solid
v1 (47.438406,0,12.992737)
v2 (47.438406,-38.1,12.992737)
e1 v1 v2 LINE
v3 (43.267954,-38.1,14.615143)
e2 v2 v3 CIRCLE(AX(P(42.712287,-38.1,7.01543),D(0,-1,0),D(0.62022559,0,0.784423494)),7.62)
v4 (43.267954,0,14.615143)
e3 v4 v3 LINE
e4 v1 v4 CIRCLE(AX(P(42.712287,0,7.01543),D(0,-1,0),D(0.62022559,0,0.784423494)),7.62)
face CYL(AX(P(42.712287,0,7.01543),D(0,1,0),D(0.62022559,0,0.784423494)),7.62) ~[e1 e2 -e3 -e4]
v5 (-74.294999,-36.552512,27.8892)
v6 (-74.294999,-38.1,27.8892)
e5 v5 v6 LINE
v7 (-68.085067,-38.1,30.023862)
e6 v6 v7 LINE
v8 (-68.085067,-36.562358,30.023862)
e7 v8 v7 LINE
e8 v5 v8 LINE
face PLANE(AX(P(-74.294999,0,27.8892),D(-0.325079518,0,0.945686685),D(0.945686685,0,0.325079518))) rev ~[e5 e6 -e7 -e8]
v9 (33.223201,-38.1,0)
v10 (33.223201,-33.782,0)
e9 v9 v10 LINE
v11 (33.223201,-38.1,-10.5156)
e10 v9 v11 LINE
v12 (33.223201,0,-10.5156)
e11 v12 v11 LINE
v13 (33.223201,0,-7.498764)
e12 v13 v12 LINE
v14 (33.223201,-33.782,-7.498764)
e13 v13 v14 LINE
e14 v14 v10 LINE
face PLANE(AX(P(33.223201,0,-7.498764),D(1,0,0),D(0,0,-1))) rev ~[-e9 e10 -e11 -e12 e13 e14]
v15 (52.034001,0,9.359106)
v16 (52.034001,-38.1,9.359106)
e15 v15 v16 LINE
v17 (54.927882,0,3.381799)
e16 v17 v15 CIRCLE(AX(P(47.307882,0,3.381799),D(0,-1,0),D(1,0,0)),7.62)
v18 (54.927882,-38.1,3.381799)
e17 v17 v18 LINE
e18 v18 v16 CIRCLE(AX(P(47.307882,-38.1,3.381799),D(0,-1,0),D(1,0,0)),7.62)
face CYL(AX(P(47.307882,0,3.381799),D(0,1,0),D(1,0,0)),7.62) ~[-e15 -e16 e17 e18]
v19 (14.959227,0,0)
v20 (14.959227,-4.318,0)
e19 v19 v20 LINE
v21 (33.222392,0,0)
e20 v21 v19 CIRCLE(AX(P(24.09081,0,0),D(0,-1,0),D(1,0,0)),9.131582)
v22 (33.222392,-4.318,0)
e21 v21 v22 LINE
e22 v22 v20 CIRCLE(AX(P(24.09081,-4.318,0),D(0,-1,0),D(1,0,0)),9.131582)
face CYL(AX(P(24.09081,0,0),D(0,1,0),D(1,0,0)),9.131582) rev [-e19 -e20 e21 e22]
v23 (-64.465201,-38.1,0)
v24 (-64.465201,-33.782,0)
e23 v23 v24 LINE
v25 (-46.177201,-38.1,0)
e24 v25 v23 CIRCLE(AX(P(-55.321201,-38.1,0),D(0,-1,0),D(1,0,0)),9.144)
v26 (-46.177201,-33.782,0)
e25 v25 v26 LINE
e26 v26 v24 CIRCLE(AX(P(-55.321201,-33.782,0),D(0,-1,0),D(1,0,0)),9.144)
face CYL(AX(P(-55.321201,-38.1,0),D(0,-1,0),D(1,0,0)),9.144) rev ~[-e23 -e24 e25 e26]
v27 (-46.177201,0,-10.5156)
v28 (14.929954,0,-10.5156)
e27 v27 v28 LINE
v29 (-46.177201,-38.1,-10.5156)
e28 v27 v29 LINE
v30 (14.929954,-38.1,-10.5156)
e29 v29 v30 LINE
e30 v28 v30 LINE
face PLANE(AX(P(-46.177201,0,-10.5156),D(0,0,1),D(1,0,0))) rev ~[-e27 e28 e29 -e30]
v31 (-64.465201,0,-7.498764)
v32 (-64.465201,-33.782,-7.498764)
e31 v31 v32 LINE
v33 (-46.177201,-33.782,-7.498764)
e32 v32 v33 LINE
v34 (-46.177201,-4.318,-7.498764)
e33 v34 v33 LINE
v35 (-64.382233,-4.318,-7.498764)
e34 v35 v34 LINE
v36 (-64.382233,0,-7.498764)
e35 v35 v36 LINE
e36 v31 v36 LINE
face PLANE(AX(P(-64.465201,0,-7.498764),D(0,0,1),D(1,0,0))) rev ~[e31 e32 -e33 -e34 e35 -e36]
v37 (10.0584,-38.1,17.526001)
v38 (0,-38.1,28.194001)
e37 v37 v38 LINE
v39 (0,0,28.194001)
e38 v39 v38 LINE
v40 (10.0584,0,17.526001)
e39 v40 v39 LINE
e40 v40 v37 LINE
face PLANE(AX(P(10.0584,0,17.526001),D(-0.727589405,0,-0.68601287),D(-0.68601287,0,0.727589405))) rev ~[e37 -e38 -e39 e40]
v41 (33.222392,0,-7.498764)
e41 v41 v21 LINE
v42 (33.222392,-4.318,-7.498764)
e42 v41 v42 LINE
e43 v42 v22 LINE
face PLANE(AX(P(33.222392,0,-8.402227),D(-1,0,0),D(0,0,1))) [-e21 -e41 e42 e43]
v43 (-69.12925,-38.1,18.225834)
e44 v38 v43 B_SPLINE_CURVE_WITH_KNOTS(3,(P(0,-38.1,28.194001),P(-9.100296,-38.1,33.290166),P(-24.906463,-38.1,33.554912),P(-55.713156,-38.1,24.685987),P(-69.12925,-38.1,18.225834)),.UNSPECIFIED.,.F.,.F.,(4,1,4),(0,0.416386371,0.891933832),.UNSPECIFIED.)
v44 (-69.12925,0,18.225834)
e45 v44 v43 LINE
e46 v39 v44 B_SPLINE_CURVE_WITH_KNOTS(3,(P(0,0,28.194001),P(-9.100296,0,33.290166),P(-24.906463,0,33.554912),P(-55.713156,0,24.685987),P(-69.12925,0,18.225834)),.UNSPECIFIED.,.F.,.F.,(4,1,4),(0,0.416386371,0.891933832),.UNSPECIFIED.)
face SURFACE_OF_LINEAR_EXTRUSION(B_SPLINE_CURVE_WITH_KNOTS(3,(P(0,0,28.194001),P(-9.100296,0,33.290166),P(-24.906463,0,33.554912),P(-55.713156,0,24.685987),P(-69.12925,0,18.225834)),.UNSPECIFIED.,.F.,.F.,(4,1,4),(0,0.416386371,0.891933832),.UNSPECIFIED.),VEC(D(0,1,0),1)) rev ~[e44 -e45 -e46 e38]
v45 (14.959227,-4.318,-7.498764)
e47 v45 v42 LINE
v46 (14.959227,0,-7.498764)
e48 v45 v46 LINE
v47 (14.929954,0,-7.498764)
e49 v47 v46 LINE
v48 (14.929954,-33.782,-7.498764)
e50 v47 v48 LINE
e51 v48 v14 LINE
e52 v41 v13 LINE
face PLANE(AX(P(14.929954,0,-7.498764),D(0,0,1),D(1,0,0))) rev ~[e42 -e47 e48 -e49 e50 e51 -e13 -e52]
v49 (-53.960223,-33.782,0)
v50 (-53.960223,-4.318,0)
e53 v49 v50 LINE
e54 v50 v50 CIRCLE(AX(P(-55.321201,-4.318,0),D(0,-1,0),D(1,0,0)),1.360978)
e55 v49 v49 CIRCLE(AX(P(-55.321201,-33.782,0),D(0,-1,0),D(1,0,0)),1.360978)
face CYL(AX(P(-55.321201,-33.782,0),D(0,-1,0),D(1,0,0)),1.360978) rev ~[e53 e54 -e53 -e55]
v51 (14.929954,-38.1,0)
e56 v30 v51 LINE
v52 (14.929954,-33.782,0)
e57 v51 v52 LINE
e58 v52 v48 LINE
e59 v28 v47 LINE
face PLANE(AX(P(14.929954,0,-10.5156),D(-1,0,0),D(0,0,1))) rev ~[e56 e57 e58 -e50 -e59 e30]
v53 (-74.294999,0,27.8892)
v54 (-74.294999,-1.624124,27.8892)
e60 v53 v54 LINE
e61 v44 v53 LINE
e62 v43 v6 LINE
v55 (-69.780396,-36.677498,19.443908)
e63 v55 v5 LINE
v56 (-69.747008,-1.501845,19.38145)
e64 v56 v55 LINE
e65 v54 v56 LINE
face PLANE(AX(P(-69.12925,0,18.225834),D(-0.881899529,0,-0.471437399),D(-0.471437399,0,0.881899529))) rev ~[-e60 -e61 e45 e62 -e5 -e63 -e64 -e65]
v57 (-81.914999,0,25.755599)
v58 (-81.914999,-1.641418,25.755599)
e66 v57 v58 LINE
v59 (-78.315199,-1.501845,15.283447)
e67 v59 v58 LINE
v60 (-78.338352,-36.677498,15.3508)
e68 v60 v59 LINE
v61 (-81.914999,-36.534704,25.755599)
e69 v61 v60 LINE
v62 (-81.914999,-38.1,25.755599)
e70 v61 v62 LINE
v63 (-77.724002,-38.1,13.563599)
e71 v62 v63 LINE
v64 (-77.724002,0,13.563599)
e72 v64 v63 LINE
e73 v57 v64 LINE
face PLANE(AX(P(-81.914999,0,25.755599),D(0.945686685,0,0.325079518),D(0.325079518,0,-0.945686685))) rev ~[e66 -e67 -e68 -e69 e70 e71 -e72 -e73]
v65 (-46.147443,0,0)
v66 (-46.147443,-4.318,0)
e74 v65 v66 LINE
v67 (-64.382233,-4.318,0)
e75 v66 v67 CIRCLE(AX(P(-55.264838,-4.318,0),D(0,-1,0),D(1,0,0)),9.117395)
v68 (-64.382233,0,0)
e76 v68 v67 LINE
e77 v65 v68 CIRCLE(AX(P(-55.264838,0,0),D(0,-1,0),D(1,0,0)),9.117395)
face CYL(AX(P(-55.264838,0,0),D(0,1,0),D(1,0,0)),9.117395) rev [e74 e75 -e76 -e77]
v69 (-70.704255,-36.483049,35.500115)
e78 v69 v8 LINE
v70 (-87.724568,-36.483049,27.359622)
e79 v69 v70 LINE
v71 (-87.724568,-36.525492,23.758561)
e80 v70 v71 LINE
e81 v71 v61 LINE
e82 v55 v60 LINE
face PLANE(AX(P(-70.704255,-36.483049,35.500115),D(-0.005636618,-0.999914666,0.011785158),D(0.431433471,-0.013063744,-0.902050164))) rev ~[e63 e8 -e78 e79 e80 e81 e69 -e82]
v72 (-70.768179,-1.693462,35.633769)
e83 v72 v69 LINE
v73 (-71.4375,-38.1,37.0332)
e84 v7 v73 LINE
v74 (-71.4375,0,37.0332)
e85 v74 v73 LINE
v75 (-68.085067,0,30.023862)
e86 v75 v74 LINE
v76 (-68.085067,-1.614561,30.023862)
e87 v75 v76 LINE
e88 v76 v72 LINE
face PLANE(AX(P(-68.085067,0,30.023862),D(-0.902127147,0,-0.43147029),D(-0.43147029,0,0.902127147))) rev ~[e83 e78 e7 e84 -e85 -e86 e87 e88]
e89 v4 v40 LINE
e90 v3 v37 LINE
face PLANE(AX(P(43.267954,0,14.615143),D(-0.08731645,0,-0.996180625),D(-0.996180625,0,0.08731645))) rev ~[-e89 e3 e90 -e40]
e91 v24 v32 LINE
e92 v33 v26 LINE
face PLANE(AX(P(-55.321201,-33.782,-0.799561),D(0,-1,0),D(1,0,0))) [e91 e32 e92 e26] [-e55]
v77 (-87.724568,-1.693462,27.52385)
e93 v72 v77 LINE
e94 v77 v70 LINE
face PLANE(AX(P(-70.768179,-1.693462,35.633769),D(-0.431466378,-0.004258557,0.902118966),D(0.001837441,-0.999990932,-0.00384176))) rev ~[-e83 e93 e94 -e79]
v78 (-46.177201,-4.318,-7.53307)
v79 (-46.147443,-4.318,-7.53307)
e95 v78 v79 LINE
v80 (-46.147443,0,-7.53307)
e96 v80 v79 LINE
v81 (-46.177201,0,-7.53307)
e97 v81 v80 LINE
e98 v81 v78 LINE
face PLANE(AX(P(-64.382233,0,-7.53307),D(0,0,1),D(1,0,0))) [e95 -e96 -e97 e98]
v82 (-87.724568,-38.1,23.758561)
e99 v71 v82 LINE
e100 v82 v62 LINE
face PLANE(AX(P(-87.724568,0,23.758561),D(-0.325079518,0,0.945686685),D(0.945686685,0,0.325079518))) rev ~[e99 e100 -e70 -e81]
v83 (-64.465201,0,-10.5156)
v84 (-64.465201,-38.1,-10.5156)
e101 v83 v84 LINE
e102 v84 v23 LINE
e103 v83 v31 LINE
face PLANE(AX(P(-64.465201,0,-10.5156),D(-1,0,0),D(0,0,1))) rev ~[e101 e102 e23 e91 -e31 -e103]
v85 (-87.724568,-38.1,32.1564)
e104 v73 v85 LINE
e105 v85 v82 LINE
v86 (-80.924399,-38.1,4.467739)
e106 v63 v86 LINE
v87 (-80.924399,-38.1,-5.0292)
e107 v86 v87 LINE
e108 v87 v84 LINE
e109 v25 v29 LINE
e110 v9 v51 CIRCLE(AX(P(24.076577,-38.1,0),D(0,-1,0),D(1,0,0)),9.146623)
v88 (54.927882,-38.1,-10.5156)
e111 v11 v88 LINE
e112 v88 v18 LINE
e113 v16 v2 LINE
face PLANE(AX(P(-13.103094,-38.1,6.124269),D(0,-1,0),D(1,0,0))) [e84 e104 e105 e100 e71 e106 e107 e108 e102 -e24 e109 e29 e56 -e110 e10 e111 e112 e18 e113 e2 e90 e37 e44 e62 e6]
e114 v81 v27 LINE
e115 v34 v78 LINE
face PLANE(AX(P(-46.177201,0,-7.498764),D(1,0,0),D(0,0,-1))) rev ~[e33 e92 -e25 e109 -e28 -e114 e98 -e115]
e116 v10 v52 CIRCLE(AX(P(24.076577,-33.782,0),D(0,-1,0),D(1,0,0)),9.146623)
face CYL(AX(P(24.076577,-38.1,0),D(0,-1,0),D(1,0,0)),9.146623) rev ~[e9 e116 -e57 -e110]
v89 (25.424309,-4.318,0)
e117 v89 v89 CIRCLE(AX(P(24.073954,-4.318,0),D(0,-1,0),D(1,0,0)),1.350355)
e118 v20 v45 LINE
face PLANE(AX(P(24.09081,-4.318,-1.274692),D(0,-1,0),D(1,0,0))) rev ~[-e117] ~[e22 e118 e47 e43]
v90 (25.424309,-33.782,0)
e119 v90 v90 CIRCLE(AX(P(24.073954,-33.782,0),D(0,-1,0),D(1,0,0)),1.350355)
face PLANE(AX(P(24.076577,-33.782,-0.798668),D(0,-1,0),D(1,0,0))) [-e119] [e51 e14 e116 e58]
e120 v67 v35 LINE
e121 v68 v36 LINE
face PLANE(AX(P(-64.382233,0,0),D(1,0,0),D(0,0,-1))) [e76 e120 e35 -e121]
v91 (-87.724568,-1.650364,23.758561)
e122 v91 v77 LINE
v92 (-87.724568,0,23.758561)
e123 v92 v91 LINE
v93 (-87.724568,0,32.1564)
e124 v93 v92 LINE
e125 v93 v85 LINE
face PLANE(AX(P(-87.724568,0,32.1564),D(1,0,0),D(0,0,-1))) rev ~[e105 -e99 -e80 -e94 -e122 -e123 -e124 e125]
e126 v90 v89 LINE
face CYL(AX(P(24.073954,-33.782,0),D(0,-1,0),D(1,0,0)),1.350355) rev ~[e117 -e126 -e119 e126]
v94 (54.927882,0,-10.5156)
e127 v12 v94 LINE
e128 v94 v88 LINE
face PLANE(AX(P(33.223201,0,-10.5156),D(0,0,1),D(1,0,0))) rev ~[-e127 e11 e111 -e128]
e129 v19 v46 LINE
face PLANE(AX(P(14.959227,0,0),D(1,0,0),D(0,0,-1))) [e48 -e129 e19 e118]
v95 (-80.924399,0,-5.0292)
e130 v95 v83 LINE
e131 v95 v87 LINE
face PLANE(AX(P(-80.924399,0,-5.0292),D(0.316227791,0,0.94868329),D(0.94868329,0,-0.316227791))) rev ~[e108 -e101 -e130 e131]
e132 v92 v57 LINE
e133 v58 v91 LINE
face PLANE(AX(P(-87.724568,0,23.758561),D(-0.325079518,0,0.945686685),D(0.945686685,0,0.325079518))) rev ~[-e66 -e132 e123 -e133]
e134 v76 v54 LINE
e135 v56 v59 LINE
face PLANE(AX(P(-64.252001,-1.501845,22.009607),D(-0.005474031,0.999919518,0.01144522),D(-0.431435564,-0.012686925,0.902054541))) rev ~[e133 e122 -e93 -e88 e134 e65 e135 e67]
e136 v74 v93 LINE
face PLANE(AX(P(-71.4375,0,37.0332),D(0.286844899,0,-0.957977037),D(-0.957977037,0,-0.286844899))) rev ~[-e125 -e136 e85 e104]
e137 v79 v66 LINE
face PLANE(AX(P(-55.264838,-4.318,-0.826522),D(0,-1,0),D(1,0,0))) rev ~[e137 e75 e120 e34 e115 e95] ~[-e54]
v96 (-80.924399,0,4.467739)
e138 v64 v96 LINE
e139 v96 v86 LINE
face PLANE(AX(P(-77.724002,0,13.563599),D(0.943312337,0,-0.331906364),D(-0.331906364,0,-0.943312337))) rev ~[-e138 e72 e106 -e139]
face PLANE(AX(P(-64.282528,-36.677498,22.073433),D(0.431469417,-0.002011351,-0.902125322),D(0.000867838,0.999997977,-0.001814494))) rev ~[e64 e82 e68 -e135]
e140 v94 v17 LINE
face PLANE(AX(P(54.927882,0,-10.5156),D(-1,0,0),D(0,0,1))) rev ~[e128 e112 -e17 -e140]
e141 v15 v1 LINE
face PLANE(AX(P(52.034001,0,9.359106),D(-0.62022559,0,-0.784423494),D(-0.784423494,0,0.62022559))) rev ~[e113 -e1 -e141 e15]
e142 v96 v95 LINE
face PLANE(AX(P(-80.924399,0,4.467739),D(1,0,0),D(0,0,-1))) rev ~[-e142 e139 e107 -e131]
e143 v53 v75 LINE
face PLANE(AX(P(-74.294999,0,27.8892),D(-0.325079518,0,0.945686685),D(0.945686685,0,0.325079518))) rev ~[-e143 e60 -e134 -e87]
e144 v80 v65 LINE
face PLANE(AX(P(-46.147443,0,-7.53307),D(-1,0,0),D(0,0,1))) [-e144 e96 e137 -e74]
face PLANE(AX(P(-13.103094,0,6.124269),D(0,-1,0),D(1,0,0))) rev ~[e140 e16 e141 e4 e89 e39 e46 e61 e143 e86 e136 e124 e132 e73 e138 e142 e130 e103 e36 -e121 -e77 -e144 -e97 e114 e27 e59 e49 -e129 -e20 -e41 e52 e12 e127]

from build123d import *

# Parameters (mm, degrees)
F1_DEPTH  = 38.1
F3_DEPTH  = 25.4
F6_DEPTH  = 4.318
F8_DEPTH  = 4.318
F9_R      = 1.3609782851
F9_R_2    = 1.3503546706
F10_DEPTH = 61.214


# Not quite as in the source:
# - a feature names something its author has since deleted; it is built from what else it names


with BuildPart() as f1:
    # F0 (on Front) → F1 (new body)
    with BuildSketch(Plane.XZ):
        with BuildLine():
            Line((52.0340008008, 9.3591057662), (47.4384056476, 12.9927370075))
            ThreePointArc((47.4384056476, 12.9927370075), (45.4749605723, 14.1169814212), (43.2679541409, 14.615142718))
            Line((43.2679541409, 14.615142718), (10.0584002212, 17.5260007381))
            Line((10.0584002212, 17.5260007381), (0, 28.1940009445))
            add(Edge.make_bspline(
                [(0, 28.1940009445), (-9.1002955269, 33.2901659502), (-24.9064630473, 33.5549116559), (-55.7131559047, 24.6859865442), (-69.1292500573, 18.2258343206)],
                knots=[0, 0, 0, 0, 0.4163863711, 0.8919338321, 0.8919338321, 0.8919338321, 0.8919338321], degree=3))
            add(Edge.make_bspline(
                [(-69.1292500573, 18.2258343206), (-72.1780012369, 16.7577917973), (-75.0713687219, 15.2003305751), (-77.7240023017, 13.5635994375)],
                knots=[0.8919338321, 0.8919338321, 0.8919338321, 0.8919338321, 1, 1, 1, 1], degree=3))
            Line((-77.7240023017, 13.5635994375), (-80.9243991971, 4.4677392631))
            Line((-80.9243991971, 4.4677392631), (-80.9243991971, -5.0292001106))
            Line((-80.9243991971, -5.0292001106), (-64.465200973, -10.5156))
            Line((-64.465200973, -10.5156), (-64.465200973, -7.498764433))
            Line((-64.465200973, -7.498764433), (-64.465200973, 0))
            ThreePointArc((-64.465200973, 0), (-55.321200973, 9.144), (-46.177200973, 0))
            Line((-46.177200973, 0), (-46.177200973, -7.498764433))
            Line((-46.177200973, -7.498764433), (-46.177200973, -10.5156))
            Line((-46.177200973, -10.5156), (14.9299539626, -10.5156))
            Line((14.9299539626, -10.5156), (14.9299539626, -7.498764433))
            Line((14.9299539626, -7.498764433), (14.9299539626, 0))
            ThreePointArc((14.9299539626, 0), (24.076577276, 9.1466233134), (33.2232005894, 0))
            Line((33.2232005894, 0), (33.2232005894, -7.498764433))
            Line((33.2232005894, -7.498764433), (33.2232005894, -10.5156004429))
            Line((33.2232005894, -10.5156004429), (54.9278818071, -10.5156004429))
            Line((54.9278818071, -10.5156004429), (54.9278818071, 3.3817987423))
            ThreePointArc((54.9278818071, 3.3817987423), (54.1663592887, 6.7022936804), (52.0340008008, 9.3591057662))
        make_face()
        with BuildLine():
            add(Edge.make_bspline(
                [(-69.1292500573, 18.2258343206), (-72.1780012369, 16.7577917973), (-75.0713687219, 15.2003305751), (-77.7240023017, 13.5635994375)],
                knots=[0.8919338321, 0.8919338321, 0.8919338321, 0.8919338321, 1, 1, 1, 1], degree=3))
            Line((-69.1292500573, 18.2258343206), (-74.2949992421, 27.8891995555))
            Line((-74.2949992421, 27.8891995555), (-81.9149985909, 25.7555991411))
            Line((-81.9149985909, 25.7555991411), (-77.7240023017, 13.5635994375))
        make_face()
        with BuildLine():
            Line((14.9299539626, -7.498764433), (33.2232005894, -7.498764433))
            Line((33.2232005894, -7.498764433), (33.2232005894, 0))
            ThreePointArc((33.2232005894, 0), (24.076577276, 9.1466233134), (14.9299539626, 0))
            Line((14.9299539626, 0), (14.9299539626, -7.498764433))
        make_face()
        Polygon((-81.9149985909, 25.7555991411), (-74.2949992421, 27.8891995555), (-68.0850669491, 30.023861943), (-71.4375004172, 37.033200264), (-87.724568169, 32.1564003825), (-87.724568169, 23.7585613183), align=None)
        with BuildLine():
            Line((-64.465200973, -7.498764433), (-46.177200973, -7.498764433))
            Line((-46.177200973, -7.498764433), (-46.177200973, 0))
            ThreePointArc((-46.177200973, 0), (-55.321200973, 9.144), (-64.465200973, 0))
            Line((-64.465200973, 0), (-64.465200973, -7.498764433))
        make_face()
    extrude(amount=F1_DEPTH)

    # F2 (on face) → F3 (cut)
    with BuildSketch(Plane(origin=(-43.723380858, 0, -20.9120631104), x_dir=(0, 1, 0), z_dir=(0.9021271467, 0, 0.4314702901))):
        Polygon((-36.6774983704, 47.6490445435), (-1.5018450795, 47.5782938302), (-1.6934617888, 62.6805573702), (-36.4830493927, 62.532402575), align=None)
    extrude(amount=-F3_DEPTH, mode=Mode.SUBTRACT)

    # F5 (on face) → F6 (cut)
    with BuildSketch(Plane.XZ.offset(38.1)):
        with BuildLine():
            Line((-64.465200973, 0), (-64.465200973, -7.498764433))
            Line((-64.465200973, -7.498764433), (-46.177200973, -7.498764433))
            Line((-46.177200973, -7.498764433), (-46.177200973, 0))
            ThreePointArc((-46.177200973, 0), (-55.321200973, 9.144), (-64.465200973, 0))
        make_face()
        with BuildLine():
            Line((14.9299539626, 0), (14.9299539626, -7.498764433))
            Line((14.9299539626, -7.498764433), (33.2232005894, -7.498764433))
            Line((33.2232005894, -7.498764433), (33.2232005894, 0))
            ThreePointArc((33.2232005894, 0), (24.076577276, 9.1466233134), (14.9299539626, 0))
        make_face()
    extrude(amount=-F6_DEPTH, mode=Mode.SUBTRACT)

    # F7 (on face) → F8 (cut)
    with BuildSketch(Plane.XZ):
        with BuildLine():
            Line((14.9592272937, -8.4022274241), (33.2223922014, -8.4022274241))
            Line((33.2223922014, -8.4022274241), (33.2223922014, 0))
            ThreePointArc((33.2223922014, 0), (24.0908097476, 9.1315824538), (14.9592272937, 0))
            Line((14.9592272937, 0), (14.9592272937, -8.4022274241))
        make_face()
        with BuildLine():
            Line((-64.3822327256, -7.5330701657), (-46.1474433541, -7.5330701657))
            Line((-46.1474433541, -7.5330701657), (-46.1474433541, 0))
            ThreePointArc((-46.1474433541, 0), (-55.2648380399, 9.1173946857), (-64.3822327256, 0))
            Line((-64.3822327256, 0), (-64.3822327256, -7.5330701657))
        make_face()
    extrude(amount=F8_DEPTH, mode=Mode.SUBTRACT)

    # F9 (on face) → F10 (cut)
    with BuildSketch(Plane.XZ.offset(33.782)):
        with Locations((-55.321200973, 0)):
            Circle(F9_R)
        with Locations((24.0739539626, 0)):
            Circle(F9_R_2)
    extrude(amount=-F10_DEPTH, mode=Mode.SUBTRACT)


solid = f1.part
